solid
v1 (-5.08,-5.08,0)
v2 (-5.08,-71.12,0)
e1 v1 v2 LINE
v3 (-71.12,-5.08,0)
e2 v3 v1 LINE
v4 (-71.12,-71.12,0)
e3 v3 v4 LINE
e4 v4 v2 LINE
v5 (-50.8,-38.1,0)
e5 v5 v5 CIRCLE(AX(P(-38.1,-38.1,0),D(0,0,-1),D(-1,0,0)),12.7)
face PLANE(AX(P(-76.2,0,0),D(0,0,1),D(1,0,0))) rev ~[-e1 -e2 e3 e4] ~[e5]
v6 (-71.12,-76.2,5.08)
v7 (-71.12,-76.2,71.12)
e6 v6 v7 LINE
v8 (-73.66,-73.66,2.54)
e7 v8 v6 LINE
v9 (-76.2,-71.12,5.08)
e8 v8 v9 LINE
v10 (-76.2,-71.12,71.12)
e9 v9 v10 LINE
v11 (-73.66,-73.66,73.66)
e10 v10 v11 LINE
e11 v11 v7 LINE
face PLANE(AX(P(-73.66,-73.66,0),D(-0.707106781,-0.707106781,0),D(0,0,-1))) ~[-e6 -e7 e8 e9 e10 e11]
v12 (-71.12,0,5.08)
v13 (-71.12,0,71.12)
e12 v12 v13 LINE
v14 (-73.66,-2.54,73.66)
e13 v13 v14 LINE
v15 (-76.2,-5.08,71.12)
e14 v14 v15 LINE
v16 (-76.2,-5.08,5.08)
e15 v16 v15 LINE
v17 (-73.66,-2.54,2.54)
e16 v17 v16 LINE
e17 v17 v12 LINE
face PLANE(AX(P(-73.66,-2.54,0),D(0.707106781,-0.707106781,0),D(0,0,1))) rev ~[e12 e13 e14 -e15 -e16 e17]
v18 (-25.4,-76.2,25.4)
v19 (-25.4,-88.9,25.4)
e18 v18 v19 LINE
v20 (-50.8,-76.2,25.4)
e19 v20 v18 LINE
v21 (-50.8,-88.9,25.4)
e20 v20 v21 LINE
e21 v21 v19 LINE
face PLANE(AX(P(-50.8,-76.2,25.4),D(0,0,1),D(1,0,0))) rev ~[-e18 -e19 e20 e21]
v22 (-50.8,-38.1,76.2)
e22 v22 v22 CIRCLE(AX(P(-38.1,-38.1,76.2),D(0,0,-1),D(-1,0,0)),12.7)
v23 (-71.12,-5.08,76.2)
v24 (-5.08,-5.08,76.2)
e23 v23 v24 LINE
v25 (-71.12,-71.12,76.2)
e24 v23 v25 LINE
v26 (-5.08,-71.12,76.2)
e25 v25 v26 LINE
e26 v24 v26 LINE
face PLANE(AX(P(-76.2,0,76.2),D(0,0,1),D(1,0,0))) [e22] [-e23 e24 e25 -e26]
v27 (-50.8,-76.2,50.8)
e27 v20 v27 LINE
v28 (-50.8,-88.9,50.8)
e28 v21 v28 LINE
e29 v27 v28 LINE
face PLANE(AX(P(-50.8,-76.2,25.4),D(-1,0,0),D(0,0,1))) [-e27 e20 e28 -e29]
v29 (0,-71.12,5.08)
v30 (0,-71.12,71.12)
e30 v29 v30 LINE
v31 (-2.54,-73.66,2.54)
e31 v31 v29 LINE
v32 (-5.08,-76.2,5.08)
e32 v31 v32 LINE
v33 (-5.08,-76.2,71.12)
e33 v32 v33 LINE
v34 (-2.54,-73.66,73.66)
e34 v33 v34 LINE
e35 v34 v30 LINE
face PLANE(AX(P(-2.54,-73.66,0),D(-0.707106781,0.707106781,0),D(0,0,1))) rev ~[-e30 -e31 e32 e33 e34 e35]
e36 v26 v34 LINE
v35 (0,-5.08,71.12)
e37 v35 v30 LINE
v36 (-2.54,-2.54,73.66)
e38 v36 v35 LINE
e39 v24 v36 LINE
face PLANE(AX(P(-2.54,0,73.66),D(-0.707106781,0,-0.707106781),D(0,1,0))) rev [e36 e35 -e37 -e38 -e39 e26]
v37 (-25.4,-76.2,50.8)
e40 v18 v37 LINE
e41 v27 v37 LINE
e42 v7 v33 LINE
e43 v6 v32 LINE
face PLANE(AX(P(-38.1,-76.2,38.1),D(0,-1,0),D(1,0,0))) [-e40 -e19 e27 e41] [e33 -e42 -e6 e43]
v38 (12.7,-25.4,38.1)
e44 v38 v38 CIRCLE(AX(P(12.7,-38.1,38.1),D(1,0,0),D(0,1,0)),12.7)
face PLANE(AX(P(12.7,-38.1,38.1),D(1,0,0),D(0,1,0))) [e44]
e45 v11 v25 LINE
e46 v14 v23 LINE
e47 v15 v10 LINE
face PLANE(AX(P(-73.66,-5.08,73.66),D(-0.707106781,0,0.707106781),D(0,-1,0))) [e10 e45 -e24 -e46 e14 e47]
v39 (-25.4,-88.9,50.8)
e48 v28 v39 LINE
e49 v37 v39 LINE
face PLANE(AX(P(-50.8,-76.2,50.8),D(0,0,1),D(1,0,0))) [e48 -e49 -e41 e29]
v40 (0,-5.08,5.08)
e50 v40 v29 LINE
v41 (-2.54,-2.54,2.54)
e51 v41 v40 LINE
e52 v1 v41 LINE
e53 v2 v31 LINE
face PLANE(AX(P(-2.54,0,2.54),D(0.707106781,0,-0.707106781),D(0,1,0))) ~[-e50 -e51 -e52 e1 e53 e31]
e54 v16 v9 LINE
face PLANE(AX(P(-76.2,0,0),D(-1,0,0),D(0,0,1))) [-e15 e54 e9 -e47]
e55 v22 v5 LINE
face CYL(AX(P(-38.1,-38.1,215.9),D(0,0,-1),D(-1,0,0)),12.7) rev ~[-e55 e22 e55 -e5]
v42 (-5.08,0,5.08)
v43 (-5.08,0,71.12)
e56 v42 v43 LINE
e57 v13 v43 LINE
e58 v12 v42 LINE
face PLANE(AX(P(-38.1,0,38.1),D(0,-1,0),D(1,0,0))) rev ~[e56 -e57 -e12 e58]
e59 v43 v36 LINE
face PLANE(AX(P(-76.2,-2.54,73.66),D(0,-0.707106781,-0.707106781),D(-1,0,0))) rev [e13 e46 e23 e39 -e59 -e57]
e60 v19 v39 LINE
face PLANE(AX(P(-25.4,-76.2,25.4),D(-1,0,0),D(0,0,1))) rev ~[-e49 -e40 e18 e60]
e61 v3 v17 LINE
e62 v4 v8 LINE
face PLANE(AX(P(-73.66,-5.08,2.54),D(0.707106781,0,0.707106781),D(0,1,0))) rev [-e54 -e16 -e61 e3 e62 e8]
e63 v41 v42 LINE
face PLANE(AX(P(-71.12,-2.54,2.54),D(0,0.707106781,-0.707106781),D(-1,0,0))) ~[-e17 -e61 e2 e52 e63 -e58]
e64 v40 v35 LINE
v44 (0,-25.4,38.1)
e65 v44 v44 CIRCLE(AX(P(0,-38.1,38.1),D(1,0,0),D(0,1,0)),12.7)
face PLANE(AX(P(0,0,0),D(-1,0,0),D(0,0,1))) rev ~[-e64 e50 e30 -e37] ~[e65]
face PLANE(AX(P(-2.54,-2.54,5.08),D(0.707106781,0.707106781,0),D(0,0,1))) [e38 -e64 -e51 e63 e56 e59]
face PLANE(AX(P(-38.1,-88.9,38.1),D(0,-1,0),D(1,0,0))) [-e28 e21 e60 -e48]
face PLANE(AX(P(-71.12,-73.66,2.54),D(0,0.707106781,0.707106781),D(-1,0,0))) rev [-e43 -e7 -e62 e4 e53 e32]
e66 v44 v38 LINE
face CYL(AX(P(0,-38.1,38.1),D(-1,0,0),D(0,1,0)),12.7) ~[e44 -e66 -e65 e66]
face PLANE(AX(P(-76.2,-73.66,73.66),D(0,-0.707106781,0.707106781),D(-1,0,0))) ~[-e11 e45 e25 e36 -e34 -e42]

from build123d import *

# Parameters (mm, degrees)
F0_W     = 76.2
F0_H     = 76.2
F1_DEPTH = 76.2
F2_W     = 25.4
F2_H     = 25.4
F3_DEPTH = 12.7
F5_D     = 25.4
F6_R     = 12.7
F7_DEPTH = 12.7
F8_SIZE  = 5.08
F9_SIZE  = 5.08
F10_SIZE = 5.08
F11_SIZE = 5.08
F12_SIZE = 5.08
F13_SIZE = 5.08
F14_SIZE = 5.08
F15_SIZE = 5.08
F16_SIZE = 5.08
F17_SIZE = 5.08


# Not quite as in the source:
# - the program builds the solid bodies; features that only make, move or delete a surface that nothing else refers to are left out


with BuildPart() as f1:
    # F0 (on Front) → F1 (new body)
    with BuildSketch(Plane.XZ):
        with Locations((-38.1, 38.1)):
            Rectangle(F0_W, F0_H)
    extrude(amount=F1_DEPTH)

    # F2 (on face) → F3 (join)
    with BuildSketch(Plane.XZ.offset(76.2)):
        with Locations((-38.1, 38.1)):
            Rectangle(F2_W, F2_H)
    extrude(amount=F3_DEPTH)

    # F5 (through all)
    with Locations(Plane.XY.offset(76.2)):
        with Locations((-38.1, -38.1)):
            Hole(F5_D / 2)

    # F6 (on face) → F7 (join)
    with BuildSketch(Plane.YZ):
        with Locations((-38.1, 38.1)):
            Circle(F6_R)
    extrude(amount=F7_DEPTH)

    # F8
    f8_edges = [f1.edges().sort_by_distance(p)[0] for p in [
        (-38.1, -76.2, 76.2),
        (0, -38.1, 76.2),
    ]]
    chamfer(f8_edges, length=F8_SIZE)

    # F9
    f9_edges = [f1.edges().sort_by_distance(p)[0] for p in [
        (-40.64, 0, 76.2),
    ]]
    chamfer(f9_edges, length=F9_SIZE)

    # F10
    f10_edges = [f1.edges().sort_by_distance(p)[0] for p in [
        (-76.2, -38.1, 76.2),
    ]]
    chamfer(f10_edges, length=F10_SIZE)

    # F11
    f11_edges = [f1.edges().sort_by_distance(p)[0] for p in [
        (0, -76.2, 35.56),
        (-76.2, -76.2, 35.56),
    ]]
    chamfer(f11_edges, length=F11_SIZE)

    # F12
    f12_edges = [f1.edges().sort_by_distance(p)[0] for p in [
        (-38.1, -76.2, 0),
    ]]
    chamfer(f12_edges, length=F12_SIZE)

    # F13
    f13_edges = [f1.edges().sort_by_distance(p)[0] for p in [
        (0, -35.56, 0),
    ]]
    chamfer(f13_edges, length=F13_SIZE)

    # F14
    f14_edges = [f1.edges().sort_by_distance(p)[0] for p in [
        (0, 0, 38.1),
    ]]
    chamfer(f14_edges, length=F14_SIZE)

    # F15
    f15_edges = [f1.edges().sort_by_distance(p)[0] for p in [
        (-76.2, 0, 35.56),
    ]]
    chamfer(f15_edges, length=F15_SIZE)

    # F16
    f16_edges = [f1.edges().sort_by_distance(p)[0] for p in [
        (-76.2, -38.1, 0),
    ]]
    chamfer(f16_edges, length=F16_SIZE)

    # F17
    f17_edges = [f1.edges().sort_by_distance(p)[0] for p in [
        (-38.1, 0, 0),
    ]]
    chamfer(f17_edges, length=F17_SIZE)


solid = f1.part
